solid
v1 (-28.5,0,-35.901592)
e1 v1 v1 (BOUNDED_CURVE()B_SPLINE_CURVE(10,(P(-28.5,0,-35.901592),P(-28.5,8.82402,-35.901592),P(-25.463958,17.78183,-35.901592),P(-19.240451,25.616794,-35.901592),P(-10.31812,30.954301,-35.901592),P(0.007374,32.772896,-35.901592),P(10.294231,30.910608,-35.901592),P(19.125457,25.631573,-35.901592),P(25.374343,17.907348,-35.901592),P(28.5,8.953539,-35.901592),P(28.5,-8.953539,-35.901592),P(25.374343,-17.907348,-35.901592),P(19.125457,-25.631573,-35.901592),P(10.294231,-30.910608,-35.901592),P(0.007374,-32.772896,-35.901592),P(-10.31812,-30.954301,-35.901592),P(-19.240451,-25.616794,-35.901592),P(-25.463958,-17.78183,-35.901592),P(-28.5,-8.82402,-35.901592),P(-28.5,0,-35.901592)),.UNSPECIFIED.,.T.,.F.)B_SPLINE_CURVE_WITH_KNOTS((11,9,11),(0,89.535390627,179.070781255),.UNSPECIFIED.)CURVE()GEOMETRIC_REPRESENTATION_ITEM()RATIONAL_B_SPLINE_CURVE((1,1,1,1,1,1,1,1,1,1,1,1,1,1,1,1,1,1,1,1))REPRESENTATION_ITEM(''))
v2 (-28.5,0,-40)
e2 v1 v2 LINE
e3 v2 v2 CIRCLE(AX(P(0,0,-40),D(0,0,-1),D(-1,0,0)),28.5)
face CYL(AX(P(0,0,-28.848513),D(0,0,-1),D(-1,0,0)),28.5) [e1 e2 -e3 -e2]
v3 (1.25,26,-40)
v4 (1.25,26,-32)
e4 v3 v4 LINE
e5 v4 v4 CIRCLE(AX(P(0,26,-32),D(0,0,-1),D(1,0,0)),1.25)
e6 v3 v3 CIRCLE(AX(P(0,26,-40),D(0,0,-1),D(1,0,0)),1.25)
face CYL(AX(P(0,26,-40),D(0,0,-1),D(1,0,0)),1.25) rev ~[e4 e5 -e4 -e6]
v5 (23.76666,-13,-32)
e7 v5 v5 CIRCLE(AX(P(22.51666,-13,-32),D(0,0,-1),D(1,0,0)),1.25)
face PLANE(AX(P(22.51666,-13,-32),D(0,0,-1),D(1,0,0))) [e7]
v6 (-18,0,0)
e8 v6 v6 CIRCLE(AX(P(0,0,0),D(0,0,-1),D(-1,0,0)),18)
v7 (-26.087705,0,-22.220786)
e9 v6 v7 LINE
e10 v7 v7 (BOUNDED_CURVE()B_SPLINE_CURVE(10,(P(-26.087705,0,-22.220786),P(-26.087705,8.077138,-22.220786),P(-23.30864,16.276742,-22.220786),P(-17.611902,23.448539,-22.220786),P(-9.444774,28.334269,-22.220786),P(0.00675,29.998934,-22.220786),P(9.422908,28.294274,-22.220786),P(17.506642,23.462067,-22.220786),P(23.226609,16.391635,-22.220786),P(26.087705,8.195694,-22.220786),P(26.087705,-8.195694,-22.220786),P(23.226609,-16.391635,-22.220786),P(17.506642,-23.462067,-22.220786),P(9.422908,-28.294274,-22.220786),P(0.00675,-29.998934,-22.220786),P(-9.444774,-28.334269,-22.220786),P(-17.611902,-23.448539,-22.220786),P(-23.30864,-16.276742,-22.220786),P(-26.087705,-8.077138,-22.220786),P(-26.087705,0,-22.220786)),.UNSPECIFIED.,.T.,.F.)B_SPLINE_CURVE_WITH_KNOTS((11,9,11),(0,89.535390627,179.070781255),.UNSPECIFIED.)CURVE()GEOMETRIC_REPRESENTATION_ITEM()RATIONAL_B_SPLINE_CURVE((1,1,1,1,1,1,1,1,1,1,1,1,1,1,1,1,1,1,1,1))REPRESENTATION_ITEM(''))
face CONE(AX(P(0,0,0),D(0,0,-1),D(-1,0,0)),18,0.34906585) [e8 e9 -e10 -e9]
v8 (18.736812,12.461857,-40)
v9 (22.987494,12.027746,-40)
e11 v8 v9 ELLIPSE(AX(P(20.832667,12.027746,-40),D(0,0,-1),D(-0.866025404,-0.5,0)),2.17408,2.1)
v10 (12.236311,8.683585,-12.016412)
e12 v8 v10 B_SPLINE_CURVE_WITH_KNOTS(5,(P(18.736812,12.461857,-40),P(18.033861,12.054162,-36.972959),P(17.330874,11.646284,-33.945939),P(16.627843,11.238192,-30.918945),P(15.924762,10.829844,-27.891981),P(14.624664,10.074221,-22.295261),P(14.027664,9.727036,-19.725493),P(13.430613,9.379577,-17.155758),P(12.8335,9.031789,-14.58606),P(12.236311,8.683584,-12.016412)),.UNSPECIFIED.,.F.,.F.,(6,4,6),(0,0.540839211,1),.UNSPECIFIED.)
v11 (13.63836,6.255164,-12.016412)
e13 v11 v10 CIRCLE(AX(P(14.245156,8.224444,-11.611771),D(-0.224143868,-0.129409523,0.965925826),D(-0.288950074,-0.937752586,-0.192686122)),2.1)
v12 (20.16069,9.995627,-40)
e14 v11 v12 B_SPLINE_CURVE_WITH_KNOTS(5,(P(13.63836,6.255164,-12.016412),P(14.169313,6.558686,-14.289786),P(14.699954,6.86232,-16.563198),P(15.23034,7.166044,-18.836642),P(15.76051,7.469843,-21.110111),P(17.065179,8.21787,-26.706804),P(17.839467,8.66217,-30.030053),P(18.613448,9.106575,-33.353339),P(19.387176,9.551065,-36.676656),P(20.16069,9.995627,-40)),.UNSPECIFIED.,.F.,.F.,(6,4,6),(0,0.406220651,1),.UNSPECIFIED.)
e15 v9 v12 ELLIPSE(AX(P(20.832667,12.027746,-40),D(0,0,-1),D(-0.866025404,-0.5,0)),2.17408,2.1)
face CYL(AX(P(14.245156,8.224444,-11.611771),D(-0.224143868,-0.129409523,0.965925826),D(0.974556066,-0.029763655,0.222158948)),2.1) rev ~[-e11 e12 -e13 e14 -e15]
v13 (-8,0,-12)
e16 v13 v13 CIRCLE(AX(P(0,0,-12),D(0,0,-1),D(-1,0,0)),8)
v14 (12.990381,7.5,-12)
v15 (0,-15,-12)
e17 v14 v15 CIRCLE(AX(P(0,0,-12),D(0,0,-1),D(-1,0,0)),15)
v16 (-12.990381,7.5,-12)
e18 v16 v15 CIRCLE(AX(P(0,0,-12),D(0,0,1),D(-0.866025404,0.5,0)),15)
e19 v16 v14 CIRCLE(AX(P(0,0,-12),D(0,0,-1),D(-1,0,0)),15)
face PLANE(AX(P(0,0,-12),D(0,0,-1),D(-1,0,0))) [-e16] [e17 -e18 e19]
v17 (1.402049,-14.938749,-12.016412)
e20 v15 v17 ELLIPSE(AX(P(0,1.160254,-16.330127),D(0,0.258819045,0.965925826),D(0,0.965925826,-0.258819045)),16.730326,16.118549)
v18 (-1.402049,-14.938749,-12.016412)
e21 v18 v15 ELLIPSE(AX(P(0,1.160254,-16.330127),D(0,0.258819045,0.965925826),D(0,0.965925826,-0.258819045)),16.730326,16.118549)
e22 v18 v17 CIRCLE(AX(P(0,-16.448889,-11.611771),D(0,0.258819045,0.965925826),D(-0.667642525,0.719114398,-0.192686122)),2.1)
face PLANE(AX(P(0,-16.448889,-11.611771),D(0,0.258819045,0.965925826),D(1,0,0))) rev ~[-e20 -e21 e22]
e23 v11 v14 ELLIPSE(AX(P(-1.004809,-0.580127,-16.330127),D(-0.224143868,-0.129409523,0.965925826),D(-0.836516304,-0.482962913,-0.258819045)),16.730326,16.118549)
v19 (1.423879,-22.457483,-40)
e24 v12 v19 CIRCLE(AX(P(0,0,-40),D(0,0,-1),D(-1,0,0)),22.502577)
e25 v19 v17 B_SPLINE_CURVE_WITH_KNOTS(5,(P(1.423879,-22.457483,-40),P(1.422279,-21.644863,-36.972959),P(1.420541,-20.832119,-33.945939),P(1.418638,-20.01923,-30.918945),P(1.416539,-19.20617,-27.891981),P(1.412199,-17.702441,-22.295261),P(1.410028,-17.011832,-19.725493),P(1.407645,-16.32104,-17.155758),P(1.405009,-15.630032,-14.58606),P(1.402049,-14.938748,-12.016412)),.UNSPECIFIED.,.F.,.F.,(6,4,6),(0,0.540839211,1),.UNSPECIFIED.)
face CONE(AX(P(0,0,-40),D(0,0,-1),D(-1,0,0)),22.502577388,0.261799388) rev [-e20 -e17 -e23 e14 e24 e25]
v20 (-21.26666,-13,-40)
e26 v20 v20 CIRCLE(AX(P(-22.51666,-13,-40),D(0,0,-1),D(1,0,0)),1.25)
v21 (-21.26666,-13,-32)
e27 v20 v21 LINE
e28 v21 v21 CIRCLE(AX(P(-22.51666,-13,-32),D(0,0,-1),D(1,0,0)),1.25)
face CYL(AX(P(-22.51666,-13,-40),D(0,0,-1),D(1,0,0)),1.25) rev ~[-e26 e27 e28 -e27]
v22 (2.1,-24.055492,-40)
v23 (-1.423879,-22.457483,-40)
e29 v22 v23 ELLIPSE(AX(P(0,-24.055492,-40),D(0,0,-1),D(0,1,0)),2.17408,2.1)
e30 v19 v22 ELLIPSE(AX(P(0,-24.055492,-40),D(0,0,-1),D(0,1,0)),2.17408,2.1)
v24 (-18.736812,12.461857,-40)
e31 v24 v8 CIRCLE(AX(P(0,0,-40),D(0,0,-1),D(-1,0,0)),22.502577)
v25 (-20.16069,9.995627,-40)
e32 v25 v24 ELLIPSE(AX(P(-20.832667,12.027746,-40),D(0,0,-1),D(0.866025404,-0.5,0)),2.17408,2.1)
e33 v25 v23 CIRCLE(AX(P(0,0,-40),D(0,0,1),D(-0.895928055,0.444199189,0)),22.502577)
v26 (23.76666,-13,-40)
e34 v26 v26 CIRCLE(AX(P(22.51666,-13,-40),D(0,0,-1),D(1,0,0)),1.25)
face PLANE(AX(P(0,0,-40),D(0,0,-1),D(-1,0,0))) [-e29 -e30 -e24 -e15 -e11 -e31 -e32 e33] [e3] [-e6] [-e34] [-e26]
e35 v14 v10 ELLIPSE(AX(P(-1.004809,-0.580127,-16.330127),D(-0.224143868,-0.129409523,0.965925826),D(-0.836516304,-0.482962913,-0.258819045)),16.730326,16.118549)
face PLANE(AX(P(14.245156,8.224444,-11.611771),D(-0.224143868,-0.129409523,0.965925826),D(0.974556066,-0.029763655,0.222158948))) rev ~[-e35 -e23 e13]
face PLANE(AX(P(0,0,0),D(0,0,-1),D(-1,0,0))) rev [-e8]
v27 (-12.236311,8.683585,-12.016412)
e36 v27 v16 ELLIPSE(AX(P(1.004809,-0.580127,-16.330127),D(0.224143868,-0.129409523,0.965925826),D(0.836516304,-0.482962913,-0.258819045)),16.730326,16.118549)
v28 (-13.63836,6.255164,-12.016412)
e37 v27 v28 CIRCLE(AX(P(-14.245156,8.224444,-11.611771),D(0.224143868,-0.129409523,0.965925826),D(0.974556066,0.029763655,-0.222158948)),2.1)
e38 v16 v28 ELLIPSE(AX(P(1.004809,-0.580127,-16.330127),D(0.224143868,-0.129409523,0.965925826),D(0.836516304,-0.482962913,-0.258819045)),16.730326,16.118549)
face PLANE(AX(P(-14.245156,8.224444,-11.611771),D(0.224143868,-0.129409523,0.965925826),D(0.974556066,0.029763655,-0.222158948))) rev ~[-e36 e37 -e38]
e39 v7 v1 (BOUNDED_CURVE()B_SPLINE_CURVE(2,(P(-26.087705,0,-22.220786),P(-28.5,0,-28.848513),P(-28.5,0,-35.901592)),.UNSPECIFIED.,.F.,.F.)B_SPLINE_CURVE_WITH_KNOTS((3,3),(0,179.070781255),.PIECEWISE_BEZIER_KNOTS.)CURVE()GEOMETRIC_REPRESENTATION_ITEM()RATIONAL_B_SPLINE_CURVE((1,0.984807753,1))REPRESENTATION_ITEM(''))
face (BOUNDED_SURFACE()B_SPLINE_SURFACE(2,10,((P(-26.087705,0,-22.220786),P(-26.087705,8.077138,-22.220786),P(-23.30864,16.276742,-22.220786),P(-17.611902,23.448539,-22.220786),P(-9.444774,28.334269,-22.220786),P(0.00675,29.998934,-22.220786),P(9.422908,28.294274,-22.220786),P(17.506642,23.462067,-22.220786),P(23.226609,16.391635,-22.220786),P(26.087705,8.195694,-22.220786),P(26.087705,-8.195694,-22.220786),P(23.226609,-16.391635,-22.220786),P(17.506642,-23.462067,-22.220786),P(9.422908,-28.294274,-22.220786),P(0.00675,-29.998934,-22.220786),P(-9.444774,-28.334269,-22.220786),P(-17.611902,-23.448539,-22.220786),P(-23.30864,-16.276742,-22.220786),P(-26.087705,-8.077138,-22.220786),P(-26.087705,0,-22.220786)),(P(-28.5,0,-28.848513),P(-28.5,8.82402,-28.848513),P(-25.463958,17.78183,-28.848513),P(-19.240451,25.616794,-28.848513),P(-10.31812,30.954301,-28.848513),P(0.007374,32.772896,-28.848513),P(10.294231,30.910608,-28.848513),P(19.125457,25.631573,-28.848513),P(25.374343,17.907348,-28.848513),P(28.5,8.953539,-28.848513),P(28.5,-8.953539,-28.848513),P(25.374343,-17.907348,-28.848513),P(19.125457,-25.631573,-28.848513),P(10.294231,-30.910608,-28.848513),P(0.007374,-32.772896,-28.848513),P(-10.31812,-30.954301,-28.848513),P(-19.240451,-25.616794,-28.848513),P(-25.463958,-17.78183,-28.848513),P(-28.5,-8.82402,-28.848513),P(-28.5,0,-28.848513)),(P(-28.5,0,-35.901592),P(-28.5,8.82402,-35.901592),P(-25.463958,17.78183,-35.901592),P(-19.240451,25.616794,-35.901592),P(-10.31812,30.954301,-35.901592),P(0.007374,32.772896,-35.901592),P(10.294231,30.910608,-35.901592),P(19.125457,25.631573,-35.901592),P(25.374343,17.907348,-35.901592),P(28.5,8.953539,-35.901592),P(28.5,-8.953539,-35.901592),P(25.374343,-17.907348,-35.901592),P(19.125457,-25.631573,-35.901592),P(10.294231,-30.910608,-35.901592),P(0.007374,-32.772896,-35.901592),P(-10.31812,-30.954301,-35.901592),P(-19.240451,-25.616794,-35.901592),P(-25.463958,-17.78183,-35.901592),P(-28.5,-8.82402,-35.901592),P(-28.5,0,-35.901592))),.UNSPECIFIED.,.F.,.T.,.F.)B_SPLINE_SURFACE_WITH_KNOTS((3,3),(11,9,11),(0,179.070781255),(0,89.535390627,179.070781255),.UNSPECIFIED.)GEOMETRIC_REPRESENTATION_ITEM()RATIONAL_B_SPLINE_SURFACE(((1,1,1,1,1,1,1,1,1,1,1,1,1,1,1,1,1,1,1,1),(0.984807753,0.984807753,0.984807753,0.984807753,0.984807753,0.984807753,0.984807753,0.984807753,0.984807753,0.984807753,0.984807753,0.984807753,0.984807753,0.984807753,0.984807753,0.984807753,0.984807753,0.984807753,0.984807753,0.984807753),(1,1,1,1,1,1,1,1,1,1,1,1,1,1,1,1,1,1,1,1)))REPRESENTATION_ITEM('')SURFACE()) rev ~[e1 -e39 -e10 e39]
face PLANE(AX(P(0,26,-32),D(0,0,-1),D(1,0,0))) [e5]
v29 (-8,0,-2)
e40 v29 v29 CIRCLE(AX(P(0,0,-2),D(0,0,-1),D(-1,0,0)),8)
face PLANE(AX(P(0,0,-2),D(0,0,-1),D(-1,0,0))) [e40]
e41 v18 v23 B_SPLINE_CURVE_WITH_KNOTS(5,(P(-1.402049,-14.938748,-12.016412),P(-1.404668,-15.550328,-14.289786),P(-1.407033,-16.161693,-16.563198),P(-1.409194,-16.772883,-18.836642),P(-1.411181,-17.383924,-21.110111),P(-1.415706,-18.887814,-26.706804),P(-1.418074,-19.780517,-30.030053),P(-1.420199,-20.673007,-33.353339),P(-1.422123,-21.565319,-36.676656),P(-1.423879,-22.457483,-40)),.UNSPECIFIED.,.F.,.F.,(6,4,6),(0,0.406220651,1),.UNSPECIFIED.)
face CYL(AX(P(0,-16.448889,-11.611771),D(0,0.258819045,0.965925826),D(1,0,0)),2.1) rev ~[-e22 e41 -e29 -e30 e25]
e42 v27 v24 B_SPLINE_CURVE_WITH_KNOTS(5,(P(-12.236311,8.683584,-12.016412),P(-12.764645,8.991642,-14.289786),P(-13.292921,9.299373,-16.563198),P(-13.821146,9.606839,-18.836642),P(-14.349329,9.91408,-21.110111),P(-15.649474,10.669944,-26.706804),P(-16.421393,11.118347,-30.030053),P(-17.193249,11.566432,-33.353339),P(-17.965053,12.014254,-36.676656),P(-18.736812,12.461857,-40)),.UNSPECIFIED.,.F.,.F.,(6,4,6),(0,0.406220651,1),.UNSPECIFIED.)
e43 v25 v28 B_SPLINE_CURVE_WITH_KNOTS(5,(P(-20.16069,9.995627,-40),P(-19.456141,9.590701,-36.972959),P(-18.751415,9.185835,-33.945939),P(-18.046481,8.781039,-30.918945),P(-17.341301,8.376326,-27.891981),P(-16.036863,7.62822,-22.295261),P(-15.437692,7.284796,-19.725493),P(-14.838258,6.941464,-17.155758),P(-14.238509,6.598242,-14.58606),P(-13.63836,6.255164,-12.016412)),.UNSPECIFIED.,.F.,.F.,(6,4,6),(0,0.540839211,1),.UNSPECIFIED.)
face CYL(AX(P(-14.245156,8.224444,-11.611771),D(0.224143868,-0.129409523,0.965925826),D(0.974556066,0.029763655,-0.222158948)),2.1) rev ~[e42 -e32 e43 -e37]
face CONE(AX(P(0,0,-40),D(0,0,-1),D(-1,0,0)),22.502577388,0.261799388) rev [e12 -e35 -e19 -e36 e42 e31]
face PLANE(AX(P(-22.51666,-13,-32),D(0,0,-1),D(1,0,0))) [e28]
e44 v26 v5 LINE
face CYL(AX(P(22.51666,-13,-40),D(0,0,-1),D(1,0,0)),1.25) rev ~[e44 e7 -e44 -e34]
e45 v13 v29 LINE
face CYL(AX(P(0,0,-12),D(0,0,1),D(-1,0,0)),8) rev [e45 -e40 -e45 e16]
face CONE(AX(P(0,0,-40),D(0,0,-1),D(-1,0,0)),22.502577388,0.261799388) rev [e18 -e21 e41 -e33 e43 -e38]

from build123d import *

# Parameters (mm, degrees)
F5_R      = 2.1
F6_DEPTH  = 30
F8_R      = 2.1
F9_DEPTH  = 30
F11_R     = 2.1
F12_DEPTH = 30
F13_R     = 1.25
F14_DEPTH = 8
F15_R     = 40


with BuildPart() as f1:
    # F0 (on Front) → F1 (revolve)
    with BuildSketch(Plane.XZ):
        Polygon((0, -2), (0, 0), (-18, 0), (-28.5, -28.8485129043), (-28.5, -40), (-22.5025773881, -40), (-15, -12), (-8, -12), (-8, -2), align=None)
    revolve(axis=Axis((0, 0, -1), (0, 0, -1)))

    # F5 (on face) → F6 (cut)
    with BuildSketch(Plane(origin=(0, -4.0048094716, -14.9461524227), x_dir=(1, 0, 0), z_dir=(0, 0.2588190451, 0.9659258263))):
        with Locations((0, -12.8830588531)):
            Circle(F5_R)
    extrude(amount=-F6_DEPTH, mode=Mode.SUBTRACT)

    # F8 (on face) → F9 (cut)
    with BuildSketch(Plane(origin=(-3.4682667397, 2.0024047358, -14.9461524227), x_dir=(0.9745560663, 0.0297636554, -0.2221589485), z_dir=(0.224143868, -0.1294095226, 0.9659258263))):
        with Locations((-11.0582542606, 6.6097063567)):
            Circle(F8_R)
    extrude(amount=-F9_DEPTH, mode=Mode.SUBTRACT)

    # F11 (on face) → F12 (cut)
    with BuildSketch(Plane(origin=(3.4682667397, 2.0024047358, -14.9461524227), x_dir=(0.9745560663, -0.0297636554, 0.2221589485), z_dir=(-0.224143868, -0.1294095226, 0.9659258263))):
        with Locations((11.0582542586, 6.6097063599)):
            Circle(F11_R)
    extrude(amount=-F12_DEPTH, mode=Mode.SUBTRACT)

    # F13 (on face) → F14 (cut)
    with BuildSketch(Plane(origin=(0, 0, -40), x_dir=(1, 0, 0), z_dir=(0, 0, -1))):
        with Locations((-22.5166604984, 13)):
            Circle(F13_R)
        with Locations((22.5166604984, 13)):
            Circle(F13_R)
        with Locations((0, -26)):
            Circle(F13_R)
    extrude(amount=-F14_DEPTH, mode=Mode.SUBTRACT)

    # F15
    f15_edges = [f1.edges().sort_by_distance(p)[0] for p in [
        (28.5, 0, -28.848513),
    ]]
    fillet(f15_edges, radius=F15_R)


solid = f1.part
